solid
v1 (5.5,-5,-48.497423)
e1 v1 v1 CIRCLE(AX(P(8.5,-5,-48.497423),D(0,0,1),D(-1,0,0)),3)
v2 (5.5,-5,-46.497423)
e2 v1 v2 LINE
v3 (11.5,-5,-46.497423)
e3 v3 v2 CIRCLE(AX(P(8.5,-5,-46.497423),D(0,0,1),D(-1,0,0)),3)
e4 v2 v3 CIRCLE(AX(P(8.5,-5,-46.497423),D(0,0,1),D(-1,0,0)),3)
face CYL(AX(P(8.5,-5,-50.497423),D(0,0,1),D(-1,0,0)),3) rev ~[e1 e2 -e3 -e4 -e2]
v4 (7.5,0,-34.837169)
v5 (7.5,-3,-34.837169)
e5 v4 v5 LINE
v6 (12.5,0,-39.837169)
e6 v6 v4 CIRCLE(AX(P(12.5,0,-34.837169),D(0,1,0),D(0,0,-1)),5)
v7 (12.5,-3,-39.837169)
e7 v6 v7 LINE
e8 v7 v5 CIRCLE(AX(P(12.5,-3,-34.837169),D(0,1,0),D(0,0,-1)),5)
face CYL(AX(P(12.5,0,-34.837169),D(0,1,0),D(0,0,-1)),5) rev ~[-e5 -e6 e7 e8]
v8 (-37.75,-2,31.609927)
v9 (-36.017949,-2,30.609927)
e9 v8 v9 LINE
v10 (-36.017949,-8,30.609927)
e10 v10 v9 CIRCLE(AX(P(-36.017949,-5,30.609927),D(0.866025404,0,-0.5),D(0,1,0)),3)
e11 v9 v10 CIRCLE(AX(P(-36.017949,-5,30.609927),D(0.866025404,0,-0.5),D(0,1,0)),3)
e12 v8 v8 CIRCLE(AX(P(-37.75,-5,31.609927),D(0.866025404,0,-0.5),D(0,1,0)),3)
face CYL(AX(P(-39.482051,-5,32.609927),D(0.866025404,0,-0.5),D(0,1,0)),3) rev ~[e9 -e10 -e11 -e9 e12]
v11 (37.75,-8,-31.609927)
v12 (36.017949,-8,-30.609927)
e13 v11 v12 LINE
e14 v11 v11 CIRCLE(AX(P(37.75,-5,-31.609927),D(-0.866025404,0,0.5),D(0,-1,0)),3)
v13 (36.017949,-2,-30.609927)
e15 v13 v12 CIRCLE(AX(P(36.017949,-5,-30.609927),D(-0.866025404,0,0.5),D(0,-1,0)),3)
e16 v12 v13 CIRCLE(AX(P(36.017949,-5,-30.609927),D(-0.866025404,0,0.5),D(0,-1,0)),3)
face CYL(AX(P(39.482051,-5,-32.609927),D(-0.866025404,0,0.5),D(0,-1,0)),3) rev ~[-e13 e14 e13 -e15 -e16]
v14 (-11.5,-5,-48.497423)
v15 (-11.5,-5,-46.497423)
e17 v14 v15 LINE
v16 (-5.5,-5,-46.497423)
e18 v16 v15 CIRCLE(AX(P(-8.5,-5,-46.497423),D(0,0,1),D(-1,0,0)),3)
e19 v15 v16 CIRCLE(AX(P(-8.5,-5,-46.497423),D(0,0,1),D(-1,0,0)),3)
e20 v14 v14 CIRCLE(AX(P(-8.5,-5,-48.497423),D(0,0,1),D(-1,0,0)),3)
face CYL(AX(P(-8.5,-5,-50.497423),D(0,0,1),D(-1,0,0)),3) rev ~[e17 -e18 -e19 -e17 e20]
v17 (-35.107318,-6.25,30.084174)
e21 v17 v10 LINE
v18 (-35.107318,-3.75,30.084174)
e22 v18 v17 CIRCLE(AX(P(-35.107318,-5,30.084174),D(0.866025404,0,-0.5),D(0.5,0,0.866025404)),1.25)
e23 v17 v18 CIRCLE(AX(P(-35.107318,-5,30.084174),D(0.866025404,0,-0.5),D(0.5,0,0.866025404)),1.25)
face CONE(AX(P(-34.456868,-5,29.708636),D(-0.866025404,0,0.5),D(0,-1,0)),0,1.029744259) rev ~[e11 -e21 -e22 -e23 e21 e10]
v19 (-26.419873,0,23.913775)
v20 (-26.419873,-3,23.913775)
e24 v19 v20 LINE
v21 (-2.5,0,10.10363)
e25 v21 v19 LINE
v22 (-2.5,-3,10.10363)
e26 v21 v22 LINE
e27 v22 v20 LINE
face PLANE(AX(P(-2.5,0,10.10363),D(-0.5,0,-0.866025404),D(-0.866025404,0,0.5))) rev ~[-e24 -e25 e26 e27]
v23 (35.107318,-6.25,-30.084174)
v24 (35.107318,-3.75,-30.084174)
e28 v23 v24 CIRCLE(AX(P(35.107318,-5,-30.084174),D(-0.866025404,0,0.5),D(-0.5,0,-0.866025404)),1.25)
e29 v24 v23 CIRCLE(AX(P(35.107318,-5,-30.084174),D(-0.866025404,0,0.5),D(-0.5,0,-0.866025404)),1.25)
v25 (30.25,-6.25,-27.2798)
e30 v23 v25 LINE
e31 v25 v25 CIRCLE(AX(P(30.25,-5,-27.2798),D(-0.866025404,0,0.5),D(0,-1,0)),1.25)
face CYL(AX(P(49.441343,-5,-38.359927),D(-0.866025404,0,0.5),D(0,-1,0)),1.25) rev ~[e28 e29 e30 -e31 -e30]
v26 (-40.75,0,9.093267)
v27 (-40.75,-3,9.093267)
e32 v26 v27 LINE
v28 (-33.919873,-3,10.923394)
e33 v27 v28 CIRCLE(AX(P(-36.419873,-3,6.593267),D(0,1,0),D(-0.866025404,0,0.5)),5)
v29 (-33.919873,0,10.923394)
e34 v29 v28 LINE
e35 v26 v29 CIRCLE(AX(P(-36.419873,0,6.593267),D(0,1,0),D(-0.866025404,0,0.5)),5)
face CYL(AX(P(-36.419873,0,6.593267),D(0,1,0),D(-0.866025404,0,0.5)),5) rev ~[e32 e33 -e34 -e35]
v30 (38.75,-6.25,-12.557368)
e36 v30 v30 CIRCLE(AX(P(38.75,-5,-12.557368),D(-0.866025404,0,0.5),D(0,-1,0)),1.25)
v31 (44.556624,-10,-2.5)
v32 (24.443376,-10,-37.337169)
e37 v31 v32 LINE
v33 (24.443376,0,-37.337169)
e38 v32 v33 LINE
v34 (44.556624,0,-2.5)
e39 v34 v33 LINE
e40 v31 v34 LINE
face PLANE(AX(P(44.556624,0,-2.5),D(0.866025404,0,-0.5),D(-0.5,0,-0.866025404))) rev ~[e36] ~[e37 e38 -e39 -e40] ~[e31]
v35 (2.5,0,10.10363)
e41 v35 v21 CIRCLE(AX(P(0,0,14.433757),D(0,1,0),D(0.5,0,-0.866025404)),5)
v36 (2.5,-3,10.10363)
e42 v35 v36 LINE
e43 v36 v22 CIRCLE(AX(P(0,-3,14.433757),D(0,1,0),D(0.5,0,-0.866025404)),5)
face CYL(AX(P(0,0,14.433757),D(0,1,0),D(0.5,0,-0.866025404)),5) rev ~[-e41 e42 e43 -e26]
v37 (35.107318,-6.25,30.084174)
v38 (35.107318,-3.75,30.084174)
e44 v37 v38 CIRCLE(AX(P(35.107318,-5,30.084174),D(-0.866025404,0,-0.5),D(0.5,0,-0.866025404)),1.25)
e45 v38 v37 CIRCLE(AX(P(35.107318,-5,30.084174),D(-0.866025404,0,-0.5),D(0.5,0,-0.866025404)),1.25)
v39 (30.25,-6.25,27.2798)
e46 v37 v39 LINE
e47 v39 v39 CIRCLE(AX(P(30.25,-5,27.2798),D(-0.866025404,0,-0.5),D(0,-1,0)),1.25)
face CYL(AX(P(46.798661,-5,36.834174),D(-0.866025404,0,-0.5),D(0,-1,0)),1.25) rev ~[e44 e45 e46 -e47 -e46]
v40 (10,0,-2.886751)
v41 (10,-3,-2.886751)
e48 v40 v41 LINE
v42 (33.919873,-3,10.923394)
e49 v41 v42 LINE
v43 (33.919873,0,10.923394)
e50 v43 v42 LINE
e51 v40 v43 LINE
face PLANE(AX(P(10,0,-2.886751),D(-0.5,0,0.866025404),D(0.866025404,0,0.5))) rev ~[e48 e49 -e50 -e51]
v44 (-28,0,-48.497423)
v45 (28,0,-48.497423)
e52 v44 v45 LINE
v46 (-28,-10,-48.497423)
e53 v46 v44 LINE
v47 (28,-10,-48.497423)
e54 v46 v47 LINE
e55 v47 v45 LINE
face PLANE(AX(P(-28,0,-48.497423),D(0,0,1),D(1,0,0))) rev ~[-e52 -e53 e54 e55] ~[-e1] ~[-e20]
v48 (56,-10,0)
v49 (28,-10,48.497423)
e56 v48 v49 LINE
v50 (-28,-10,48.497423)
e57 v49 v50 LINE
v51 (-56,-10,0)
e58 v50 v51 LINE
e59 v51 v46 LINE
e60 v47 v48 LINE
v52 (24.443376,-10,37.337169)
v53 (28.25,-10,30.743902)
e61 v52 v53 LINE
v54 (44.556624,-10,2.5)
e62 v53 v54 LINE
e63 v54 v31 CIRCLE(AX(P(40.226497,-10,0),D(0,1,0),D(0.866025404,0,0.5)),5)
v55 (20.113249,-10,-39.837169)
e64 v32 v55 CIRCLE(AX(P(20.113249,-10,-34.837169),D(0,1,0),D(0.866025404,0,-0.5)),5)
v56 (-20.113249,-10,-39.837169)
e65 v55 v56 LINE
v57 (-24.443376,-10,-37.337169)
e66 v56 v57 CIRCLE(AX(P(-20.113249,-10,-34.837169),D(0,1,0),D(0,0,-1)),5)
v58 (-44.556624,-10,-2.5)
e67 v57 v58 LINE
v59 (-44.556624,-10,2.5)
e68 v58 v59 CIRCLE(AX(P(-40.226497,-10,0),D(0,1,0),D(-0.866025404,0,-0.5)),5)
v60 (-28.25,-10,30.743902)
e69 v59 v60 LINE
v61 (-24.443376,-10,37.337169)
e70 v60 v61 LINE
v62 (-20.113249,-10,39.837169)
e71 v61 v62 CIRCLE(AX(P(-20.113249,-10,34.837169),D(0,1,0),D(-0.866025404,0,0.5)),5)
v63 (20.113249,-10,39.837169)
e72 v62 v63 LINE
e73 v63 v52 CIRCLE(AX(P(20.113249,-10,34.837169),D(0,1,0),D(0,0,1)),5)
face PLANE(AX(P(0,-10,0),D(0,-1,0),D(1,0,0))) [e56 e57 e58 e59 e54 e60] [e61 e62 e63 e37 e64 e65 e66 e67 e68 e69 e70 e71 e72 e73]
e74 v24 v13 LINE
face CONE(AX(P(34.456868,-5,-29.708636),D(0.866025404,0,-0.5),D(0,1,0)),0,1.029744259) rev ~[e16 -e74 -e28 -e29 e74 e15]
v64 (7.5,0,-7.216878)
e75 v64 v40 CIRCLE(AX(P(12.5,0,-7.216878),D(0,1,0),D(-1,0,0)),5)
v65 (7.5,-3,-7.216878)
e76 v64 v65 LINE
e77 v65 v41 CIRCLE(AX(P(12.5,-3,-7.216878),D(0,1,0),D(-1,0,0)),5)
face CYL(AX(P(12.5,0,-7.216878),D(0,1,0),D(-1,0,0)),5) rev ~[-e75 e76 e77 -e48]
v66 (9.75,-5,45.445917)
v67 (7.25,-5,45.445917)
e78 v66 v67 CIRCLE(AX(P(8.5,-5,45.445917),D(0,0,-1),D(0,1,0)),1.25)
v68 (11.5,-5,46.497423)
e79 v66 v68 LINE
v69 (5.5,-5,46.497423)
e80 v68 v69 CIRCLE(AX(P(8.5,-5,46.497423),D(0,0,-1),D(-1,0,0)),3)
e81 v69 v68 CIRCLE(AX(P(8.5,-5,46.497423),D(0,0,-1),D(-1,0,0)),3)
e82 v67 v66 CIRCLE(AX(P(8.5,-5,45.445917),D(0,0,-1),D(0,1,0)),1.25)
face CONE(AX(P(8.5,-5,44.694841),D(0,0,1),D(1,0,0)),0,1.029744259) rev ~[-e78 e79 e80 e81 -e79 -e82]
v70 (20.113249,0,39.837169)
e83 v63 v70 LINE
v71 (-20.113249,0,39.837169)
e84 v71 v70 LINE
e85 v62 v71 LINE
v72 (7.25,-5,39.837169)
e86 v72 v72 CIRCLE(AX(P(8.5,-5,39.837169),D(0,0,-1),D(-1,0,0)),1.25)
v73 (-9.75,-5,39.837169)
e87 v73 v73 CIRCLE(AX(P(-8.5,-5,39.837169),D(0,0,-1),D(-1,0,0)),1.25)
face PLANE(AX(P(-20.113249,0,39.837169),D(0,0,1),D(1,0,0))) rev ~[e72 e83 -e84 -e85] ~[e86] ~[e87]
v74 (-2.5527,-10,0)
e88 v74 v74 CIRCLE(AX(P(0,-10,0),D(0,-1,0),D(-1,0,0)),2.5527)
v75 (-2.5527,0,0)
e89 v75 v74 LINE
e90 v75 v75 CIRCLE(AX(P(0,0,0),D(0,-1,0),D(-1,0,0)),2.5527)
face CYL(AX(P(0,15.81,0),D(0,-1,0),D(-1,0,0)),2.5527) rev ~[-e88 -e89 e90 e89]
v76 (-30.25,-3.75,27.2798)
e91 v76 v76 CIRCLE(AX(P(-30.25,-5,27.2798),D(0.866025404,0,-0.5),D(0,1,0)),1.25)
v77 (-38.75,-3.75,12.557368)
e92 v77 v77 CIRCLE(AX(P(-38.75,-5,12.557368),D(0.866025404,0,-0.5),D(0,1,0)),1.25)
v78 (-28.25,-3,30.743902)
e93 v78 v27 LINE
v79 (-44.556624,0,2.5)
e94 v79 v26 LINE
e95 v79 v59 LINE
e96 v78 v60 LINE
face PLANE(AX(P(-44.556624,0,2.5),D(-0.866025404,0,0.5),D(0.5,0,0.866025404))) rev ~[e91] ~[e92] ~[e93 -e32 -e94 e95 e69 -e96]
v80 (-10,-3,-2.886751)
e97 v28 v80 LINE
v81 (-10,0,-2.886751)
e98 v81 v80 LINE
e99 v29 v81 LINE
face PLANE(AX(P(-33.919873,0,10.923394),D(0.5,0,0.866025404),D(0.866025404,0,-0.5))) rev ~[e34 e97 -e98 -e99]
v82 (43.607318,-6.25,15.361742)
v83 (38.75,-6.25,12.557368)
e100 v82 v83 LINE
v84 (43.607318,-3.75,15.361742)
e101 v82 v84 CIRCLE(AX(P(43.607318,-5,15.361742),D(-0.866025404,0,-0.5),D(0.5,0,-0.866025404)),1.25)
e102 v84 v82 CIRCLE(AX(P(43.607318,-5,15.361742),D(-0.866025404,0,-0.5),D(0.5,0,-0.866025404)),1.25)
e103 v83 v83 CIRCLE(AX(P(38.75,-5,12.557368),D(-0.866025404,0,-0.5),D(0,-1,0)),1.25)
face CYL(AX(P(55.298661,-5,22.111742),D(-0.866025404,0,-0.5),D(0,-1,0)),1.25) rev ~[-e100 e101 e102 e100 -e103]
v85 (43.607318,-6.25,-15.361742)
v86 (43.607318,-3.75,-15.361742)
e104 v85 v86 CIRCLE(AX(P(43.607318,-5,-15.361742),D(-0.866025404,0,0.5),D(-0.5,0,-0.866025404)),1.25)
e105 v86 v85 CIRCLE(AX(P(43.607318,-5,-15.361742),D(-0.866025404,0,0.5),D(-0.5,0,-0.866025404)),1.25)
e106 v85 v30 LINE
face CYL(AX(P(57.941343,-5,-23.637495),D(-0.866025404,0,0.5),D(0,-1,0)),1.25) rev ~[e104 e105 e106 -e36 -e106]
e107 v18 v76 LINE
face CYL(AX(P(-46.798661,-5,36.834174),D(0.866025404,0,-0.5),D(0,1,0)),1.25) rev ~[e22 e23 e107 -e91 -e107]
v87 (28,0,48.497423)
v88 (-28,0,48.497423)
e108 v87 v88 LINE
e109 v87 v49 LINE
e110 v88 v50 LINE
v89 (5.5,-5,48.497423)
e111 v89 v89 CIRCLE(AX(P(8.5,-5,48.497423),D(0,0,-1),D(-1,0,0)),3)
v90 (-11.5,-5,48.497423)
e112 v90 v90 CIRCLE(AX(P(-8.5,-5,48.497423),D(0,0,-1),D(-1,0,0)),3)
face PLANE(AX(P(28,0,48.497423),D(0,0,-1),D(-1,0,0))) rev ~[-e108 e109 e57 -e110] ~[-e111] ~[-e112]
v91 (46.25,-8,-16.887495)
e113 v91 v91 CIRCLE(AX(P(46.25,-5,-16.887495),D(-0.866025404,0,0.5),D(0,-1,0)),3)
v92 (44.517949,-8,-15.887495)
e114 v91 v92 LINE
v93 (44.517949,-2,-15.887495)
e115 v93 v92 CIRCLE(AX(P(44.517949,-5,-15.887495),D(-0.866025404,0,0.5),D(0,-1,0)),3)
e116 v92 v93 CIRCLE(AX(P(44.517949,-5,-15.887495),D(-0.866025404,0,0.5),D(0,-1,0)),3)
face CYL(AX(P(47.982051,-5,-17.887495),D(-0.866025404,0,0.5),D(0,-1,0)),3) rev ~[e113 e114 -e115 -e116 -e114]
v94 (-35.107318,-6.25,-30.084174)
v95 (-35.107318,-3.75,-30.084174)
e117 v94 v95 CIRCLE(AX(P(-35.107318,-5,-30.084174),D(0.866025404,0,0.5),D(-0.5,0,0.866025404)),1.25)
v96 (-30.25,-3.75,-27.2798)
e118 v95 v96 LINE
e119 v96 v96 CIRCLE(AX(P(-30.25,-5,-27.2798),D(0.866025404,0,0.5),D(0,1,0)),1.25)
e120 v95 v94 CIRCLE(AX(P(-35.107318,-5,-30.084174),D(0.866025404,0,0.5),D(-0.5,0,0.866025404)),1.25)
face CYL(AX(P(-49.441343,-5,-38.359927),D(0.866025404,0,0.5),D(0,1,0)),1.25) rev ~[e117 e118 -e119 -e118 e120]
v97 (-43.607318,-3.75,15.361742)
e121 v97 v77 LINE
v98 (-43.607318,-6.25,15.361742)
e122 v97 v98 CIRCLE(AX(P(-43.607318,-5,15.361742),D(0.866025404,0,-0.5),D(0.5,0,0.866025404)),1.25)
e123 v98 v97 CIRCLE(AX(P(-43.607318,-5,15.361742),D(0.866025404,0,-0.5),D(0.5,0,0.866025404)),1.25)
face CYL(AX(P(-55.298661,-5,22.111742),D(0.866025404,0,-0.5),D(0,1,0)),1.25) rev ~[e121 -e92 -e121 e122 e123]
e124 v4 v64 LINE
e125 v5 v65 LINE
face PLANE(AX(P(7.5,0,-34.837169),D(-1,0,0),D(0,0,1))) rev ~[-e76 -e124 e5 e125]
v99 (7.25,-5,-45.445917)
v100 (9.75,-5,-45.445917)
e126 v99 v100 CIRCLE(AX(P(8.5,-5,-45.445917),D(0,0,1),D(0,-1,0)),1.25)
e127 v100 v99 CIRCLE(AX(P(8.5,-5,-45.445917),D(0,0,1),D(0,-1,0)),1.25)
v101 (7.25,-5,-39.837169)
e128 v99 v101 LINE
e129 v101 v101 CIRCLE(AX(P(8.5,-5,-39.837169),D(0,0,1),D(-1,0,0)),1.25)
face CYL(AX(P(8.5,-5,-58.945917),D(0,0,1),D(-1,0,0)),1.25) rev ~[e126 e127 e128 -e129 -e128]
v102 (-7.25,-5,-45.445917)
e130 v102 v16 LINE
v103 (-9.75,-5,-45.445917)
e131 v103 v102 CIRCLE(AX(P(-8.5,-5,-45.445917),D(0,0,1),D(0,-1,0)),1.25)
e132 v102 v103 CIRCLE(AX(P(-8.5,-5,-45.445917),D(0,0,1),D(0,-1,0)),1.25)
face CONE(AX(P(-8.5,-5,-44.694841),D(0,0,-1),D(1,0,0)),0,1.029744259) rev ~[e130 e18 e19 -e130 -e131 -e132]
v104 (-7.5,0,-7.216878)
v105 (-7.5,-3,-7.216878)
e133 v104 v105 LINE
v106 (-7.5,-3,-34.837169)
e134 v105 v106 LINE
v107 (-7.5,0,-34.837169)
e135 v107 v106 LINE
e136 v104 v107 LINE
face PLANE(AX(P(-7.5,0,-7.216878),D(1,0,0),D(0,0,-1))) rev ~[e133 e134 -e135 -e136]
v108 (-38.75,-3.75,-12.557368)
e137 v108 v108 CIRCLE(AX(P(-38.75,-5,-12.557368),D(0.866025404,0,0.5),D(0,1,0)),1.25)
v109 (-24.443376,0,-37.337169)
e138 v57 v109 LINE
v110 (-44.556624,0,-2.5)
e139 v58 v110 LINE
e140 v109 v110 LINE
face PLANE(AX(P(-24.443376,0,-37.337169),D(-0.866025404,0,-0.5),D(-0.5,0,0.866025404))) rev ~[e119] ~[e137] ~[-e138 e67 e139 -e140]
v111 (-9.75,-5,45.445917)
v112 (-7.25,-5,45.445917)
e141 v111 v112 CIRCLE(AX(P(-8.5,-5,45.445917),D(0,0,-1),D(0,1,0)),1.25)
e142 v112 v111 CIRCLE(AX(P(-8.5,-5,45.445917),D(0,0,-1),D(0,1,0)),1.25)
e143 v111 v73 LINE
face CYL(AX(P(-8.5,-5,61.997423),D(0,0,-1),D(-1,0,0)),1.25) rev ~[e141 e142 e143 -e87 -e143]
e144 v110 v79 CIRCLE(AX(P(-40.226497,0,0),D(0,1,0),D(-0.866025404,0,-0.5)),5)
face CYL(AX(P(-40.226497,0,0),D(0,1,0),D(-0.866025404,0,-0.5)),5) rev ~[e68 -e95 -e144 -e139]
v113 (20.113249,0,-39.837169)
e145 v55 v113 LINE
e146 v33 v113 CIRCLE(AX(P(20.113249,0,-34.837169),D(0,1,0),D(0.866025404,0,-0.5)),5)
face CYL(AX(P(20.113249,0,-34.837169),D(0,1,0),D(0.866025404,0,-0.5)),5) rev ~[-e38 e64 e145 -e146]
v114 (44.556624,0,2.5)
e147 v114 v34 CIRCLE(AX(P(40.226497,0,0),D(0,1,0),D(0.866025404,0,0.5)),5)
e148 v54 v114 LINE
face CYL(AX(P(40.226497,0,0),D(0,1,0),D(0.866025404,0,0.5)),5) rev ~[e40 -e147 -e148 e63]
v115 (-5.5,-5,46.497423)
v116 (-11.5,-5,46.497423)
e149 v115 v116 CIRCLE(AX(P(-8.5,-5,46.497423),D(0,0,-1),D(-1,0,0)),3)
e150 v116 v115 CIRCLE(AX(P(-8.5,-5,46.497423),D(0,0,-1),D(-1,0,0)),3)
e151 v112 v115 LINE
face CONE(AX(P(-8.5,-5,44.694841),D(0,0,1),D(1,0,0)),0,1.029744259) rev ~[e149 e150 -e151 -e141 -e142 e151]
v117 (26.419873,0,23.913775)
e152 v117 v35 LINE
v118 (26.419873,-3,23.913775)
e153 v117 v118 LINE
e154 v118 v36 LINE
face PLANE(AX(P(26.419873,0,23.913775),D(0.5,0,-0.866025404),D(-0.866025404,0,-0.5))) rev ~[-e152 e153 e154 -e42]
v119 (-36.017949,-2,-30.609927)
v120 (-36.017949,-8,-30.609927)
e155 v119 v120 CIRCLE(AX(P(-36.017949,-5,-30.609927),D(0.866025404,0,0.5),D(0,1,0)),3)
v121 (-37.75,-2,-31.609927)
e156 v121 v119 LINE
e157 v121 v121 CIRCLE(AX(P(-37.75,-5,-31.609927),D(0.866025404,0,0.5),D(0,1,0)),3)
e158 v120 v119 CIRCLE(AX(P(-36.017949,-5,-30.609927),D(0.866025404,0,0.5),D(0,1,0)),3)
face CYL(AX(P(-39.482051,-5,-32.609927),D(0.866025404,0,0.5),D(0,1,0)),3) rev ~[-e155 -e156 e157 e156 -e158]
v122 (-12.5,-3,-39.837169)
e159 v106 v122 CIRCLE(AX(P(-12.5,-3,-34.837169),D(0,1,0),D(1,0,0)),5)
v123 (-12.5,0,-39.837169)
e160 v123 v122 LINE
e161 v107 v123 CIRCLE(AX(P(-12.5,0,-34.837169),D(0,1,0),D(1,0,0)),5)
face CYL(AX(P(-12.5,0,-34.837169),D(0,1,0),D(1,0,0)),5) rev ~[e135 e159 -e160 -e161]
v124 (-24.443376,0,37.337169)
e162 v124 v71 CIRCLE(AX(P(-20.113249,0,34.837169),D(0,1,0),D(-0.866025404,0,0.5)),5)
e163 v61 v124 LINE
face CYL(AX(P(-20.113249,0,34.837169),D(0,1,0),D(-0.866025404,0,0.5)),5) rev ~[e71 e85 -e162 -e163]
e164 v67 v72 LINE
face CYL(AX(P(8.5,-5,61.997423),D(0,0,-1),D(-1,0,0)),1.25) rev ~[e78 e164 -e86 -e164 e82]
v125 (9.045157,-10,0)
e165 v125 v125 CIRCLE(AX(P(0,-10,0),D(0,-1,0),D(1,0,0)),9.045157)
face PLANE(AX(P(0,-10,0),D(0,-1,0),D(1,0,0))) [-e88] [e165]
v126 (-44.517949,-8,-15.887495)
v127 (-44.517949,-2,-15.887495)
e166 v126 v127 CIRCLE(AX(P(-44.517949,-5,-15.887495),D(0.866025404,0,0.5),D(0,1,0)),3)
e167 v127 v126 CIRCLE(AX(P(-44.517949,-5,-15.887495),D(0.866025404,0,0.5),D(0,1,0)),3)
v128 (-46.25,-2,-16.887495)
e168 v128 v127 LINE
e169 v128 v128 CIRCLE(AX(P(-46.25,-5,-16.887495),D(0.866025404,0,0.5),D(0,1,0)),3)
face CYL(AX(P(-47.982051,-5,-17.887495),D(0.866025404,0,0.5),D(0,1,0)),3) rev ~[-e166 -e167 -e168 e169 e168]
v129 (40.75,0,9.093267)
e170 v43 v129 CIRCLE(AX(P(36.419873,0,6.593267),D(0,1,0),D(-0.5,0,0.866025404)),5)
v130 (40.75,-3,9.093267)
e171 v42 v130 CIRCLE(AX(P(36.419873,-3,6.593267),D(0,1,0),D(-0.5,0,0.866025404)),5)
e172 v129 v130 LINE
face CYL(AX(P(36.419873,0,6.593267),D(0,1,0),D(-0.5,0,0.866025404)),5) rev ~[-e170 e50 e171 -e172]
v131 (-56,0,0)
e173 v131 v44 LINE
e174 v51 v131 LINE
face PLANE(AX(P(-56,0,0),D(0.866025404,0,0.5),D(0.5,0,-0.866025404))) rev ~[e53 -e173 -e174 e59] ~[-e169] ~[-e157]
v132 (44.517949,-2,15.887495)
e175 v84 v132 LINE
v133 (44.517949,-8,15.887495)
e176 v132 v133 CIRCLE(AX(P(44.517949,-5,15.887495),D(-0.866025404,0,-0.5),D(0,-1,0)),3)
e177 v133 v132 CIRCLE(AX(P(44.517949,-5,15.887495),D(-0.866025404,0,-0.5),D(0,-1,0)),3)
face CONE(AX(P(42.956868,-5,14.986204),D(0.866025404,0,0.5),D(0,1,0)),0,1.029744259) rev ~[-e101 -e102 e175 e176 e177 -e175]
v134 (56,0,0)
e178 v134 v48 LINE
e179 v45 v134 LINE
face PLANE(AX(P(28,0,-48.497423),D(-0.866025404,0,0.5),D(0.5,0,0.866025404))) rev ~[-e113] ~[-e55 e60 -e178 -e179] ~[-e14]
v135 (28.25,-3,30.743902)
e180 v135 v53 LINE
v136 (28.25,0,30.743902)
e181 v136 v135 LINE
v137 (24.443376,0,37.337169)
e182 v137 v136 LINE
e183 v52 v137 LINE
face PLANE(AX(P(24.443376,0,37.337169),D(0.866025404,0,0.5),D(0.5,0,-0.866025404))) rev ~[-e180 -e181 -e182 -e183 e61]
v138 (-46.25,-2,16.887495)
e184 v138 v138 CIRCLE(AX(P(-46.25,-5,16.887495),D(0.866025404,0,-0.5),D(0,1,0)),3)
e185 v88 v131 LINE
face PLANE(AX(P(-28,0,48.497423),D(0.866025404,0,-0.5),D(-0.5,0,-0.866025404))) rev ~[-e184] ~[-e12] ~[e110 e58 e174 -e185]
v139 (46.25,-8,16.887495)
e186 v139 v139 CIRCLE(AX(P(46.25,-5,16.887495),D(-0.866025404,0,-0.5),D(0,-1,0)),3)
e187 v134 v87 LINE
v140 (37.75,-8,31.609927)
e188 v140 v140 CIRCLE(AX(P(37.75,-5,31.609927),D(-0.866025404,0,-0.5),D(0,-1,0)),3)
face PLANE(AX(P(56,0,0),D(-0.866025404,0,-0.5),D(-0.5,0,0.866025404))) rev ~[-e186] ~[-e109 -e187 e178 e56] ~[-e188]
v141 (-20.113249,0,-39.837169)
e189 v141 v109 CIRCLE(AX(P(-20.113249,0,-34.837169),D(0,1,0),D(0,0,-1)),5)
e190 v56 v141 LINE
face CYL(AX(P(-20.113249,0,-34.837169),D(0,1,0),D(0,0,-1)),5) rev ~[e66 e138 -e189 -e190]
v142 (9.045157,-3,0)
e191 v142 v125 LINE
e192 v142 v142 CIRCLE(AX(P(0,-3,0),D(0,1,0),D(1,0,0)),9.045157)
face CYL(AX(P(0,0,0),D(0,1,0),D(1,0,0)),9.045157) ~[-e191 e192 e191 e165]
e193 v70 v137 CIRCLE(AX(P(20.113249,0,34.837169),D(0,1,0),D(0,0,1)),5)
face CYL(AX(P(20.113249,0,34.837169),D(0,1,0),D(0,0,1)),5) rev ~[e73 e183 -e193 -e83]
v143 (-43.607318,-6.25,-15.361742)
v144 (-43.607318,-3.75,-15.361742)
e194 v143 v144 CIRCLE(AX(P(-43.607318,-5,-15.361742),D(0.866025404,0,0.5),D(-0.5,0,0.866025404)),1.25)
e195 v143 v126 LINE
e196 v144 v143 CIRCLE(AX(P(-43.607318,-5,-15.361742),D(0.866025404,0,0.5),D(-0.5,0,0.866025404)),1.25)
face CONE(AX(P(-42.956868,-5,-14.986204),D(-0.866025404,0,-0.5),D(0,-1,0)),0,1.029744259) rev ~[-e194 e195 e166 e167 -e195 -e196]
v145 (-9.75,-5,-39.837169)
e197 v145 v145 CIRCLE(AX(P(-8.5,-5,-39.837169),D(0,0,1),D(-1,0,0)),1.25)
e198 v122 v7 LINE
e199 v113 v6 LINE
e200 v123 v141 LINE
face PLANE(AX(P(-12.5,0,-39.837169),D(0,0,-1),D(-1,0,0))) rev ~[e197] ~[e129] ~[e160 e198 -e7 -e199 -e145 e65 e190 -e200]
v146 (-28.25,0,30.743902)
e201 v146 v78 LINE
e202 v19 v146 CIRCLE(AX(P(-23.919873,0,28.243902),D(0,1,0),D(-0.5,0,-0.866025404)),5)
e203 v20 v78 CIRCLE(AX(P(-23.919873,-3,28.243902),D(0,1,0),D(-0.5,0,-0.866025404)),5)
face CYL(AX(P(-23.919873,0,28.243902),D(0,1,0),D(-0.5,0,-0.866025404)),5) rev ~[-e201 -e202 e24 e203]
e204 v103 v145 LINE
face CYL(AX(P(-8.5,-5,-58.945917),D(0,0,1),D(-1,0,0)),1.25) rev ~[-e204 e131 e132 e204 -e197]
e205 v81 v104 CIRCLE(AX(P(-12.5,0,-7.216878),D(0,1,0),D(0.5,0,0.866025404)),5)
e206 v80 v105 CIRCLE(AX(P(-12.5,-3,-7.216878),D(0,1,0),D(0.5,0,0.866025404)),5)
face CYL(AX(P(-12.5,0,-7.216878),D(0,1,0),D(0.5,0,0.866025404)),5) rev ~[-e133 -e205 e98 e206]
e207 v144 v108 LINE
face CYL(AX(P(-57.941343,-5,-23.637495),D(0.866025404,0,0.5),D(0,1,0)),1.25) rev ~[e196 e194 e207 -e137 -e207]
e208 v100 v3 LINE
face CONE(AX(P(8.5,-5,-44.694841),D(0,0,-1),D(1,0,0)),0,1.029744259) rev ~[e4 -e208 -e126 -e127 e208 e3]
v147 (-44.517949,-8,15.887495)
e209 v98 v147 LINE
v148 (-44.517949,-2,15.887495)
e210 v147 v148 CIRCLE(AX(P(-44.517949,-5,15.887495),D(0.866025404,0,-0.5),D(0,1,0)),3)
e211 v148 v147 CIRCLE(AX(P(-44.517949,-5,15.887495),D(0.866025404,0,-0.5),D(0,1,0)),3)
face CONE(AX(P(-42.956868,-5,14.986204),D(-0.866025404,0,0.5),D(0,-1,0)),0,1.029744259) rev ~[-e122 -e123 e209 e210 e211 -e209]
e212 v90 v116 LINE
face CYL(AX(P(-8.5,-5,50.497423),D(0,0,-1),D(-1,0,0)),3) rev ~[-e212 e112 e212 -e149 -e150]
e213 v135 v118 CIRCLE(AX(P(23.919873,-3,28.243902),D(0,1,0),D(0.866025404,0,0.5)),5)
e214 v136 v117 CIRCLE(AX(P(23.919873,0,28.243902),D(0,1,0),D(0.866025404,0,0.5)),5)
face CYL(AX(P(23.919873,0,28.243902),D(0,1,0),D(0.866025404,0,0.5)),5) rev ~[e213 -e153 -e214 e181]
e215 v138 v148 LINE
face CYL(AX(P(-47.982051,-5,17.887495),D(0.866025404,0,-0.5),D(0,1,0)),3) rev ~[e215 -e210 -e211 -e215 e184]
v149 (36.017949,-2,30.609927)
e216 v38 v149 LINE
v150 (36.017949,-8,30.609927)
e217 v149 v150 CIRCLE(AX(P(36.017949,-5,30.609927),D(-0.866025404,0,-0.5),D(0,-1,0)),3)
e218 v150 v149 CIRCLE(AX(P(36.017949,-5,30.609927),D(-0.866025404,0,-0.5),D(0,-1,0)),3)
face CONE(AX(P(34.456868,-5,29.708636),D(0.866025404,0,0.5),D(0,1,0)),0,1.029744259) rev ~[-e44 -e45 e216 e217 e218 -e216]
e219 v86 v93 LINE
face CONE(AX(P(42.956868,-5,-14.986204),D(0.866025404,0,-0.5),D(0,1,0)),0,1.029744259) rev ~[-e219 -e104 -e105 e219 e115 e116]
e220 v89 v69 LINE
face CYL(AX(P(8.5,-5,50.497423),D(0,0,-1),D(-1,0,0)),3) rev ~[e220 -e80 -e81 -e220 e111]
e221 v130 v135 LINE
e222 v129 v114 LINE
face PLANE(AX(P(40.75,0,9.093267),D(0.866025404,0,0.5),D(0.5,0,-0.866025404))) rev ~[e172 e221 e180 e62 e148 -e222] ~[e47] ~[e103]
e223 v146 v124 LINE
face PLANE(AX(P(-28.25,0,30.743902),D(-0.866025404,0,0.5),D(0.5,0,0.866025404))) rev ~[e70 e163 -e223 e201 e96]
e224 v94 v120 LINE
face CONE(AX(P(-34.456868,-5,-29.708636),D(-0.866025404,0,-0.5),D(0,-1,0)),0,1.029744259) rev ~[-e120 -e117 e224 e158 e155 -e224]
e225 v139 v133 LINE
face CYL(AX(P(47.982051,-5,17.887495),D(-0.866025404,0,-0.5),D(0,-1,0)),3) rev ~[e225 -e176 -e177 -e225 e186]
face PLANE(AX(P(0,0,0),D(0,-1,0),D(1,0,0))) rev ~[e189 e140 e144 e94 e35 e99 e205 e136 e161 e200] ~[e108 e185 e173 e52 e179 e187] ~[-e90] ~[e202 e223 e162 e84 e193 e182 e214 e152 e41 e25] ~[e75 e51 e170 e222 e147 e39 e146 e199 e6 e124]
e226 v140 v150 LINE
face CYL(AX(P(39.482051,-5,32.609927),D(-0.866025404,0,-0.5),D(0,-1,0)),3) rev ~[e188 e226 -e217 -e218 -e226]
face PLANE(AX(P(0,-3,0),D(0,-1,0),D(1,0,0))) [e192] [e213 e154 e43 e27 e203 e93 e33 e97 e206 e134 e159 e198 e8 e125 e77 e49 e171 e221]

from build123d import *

# Parameters (mm, degrees)
F0_R      = 9.0451569713
F1_DEPTH  = 3
F2_DEPTH  = 10
F8_D      = 6
F8_DEPTH  = 2
F8_TIP    = 1.8025818571
F9_D      = 2.5
F9_DEPTH  = 13.5
F9_START  = 3.0515061
F9_TIP    = 0.7510757738
F10_D     = 2.5
F10_DEPTH = 13.5
F10_TIP   = 0.7510757738
F11_D     = 6
F11_DEPTH = 2
F11_TIP   = 1.8025818571
F12_D     = 6
F12_DEPTH = 2
F12_TIP   = 1.8025818571
F13_D     = 2.5
F13_DEPTH = 13.5
F13_START = 3.0515061
F13_TIP   = 0.7510757738
F15_D     = 2.5
F15_DEPTH = 13.5
F15_TIP   = 0.7510757738
F16_D     = 6
F16_DEPTH = 2
F16_TIP   = 1.8025818571
F17_D     = 6
F17_DEPTH = 2
F17_TIP   = 1.8025818571
F18_D     = 2.5
F18_DEPTH = 13.5
F18_START = 3.0515061
F18_TIP   = 0.7510757738
F19_D     = 2.5
F19_DEPTH = 13.5
F19_TIP   = 0.7510757738
F20_D     = 6
F20_DEPTH = 2
F20_TIP   = 1.8025818571
F21_D     = 5.1054
F21_DEPTH = 15.81
F21_TIP   = 1.5338169022


with BuildPart() as f1:
    # F0 (on Front) → F1 (new body)
    with BuildSketch(Plane.XZ):
        Polygon((28, -48.4974226119), (56, 0), (28, 48.4974226119), (-28, 48.4974226119), (-56, 0), (-28, -48.4974226119), align=None)
        with BuildLine():
            ThreePointArc((44.556624327, 2.5), (45.2264973081, 0), (44.556624327, -2.5))
            Line((44.556624327, -2.5), (24.443375673, -37.3371685741))
            ThreePointArc((24.443375673, -37.3371685741), (22.6132486541, -39.167295593), (20.1132486541, -39.8371685741))
            Line((20.1132486541, -39.8371685741), (12.5, -39.8371685741))
            Line((12.5, -39.8371685741), (-12.5, -39.8371685741))
            Line((-12.5, -39.8371685741), (-20.1132486541, -39.8371685741))
            ThreePointArc((-20.1132486541, -39.8371685741), (-22.6132486541, -39.167295593), (-24.443375673, -37.3371685741))
            Line((-24.443375673, -37.3371685741), (-44.556624327, -2.5))
            ThreePointArc((-44.556624327, -2.5), (-45.2264973081, 0), (-44.556624327, 2.5))
            Line((-44.556624327, 2.5), (-40.75, 9.0932667397))
            Line((-40.75, 9.0932667397), (-28.25, 30.7439018343))
            Line((-28.25, 30.7439018343), (-24.443375673, 37.3371685741))
            ThreePointArc((-24.443375673, 37.3371685741), (-22.6132486541, 39.167295593), (-20.1132486541, 39.8371685741))
            Line((-20.1132486541, 39.8371685741), (20.1132486541, 39.8371685741))
            ThreePointArc((20.1132486541, 39.8371685741), (22.6132486541, 39.167295593), (24.443375673, 37.3371685741))
            Line((24.443375673, 37.3371685741), (28.25, 30.7439018343))
            Line((28.25, 30.7439018343), (40.75, 9.0932667397))
            Line((40.75, 9.0932667397), (44.556624327, 2.5))
        make_face(mode=Mode.SUBTRACT)
        with BuildLine():
            ThreePointArc((33.9198729811, 10.9233937587), (37.7139682066, 11.4228958712), (40.75, 9.0932667397))
            Line((40.75, 9.0932667397), (28.25, 30.7439018343))
            ThreePointArc((28.25, 30.7439018343), (28.7495021125, 26.9498066088), (26.4198729811, 23.9137748154))
            Line((26.4198729811, 23.9137748154), (2.5, 10.1036297108))
            ThreePointArc((2.5, 10.1036297108), (0, 9.4337567297), (-2.5, 10.1036297108))
            Line((-2.5, 10.1036297108), (-26.4198729811, 23.9137748154))
            ThreePointArc((-26.4198729811, 23.9137748154), (-28.7495021125, 26.9498066088), (-28.25, 30.7439018343))
            Line((-28.25, 30.7439018343), (-40.75, 9.0932667397))
            ThreePointArc((-40.75, 9.0932667397), (-37.7139682066, 11.4228958712), (-33.9198729811, 10.9233937587))
            Line((-33.9198729811, 10.9233937587), (-10, -2.8867513459))
            ThreePointArc((-10, -2.8867513459), (-8.1698729811, -4.7168783649), (-7.5, -7.2168783649))
            Line((-7.5, -7.2168783649), (-7.5, -34.8371685741))
            ThreePointArc((-7.5, -34.8371685741), (-8.9644660941, -38.37270248), (-12.5, -39.8371685741))
            Line((-12.5, -39.8371685741), (12.5, -39.8371685741))
            ThreePointArc((12.5, -39.8371685741), (8.9644660941, -38.37270248), (7.5, -34.8371685741))
            Line((7.5, -34.8371685741), (7.5, -7.2168783649))
            ThreePointArc((7.5, -7.2168783649), (8.1698729811, -4.7168783649), (10, -2.8867513459))
            Line((10, -2.8867513459), (33.9198729811, 10.9233937587))
        make_face()
        Circle(F0_R, mode=Mode.SUBTRACT)
        Circle(F0_R)
    extrude(amount=F1_DEPTH)

    # F0 (on Front) → F2 (join)
    with BuildSketch(Plane.XZ):
        Polygon((28, -48.4974226119), (56, 0), (28, 48.4974226119), (-28, 48.4974226119), (-56, 0), (-28, -48.4974226119), align=None)
        with BuildLine():
            ThreePointArc((44.556624327, 2.5), (45.2264973081, 0), (44.556624327, -2.5))
            Line((44.556624327, -2.5), (24.443375673, -37.3371685741))
            ThreePointArc((24.443375673, -37.3371685741), (22.6132486541, -39.167295593), (20.1132486541, -39.8371685741))
            Line((20.1132486541, -39.8371685741), (12.5, -39.8371685741))
            Line((12.5, -39.8371685741), (-12.5, -39.8371685741))
            Line((-12.5, -39.8371685741), (-20.1132486541, -39.8371685741))
            ThreePointArc((-20.1132486541, -39.8371685741), (-22.6132486541, -39.167295593), (-24.443375673, -37.3371685741))
            Line((-24.443375673, -37.3371685741), (-44.556624327, -2.5))
            ThreePointArc((-44.556624327, -2.5), (-45.2264973081, 0), (-44.556624327, 2.5))
            Line((-44.556624327, 2.5), (-40.75, 9.0932667397))
            Line((-40.75, 9.0932667397), (-28.25, 30.7439018343))
            Line((-28.25, 30.7439018343), (-24.443375673, 37.3371685741))
            ThreePointArc((-24.443375673, 37.3371685741), (-22.6132486541, 39.167295593), (-20.1132486541, 39.8371685741))
            Line((-20.1132486541, 39.8371685741), (20.1132486541, 39.8371685741))
            ThreePointArc((20.1132486541, 39.8371685741), (22.6132486541, 39.167295593), (24.443375673, 37.3371685741))
            Line((24.443375673, 37.3371685741), (28.25, 30.7439018343))
            Line((28.25, 30.7439018343), (40.75, 9.0932667397))
            Line((40.75, 9.0932667397), (44.556624327, 2.5))
        make_face(mode=Mode.SUBTRACT)
        Circle(F0_R)
    extrude(amount=F2_DEPTH)

    # F8
    with Locations(Plane(origin=(0, 0, -48.4974226119), x_dir=(1, 0, 0), z_dir=(0, 0, -1))):
        with Locations((-8.5, 5), (8.5, 5)):
            Hole(F8_D / 2, depth=F8_DEPTH)
            with Locations((0, 0, -(F8_DEPTH + F8_TIP / 2))):  # 118° drill point
                Cone(0, F8_D / 2, F8_TIP, mode=Mode.SUBTRACT)

    # F9
    # its depths count from where the whole tool has entered the part; down to there all is cleared
    with Locations(Plane(origin=(0, 0, -48.4974226119), x_dir=(1, 0, 0), z_dir=(0, 0, -1)).offset(-F9_START)):
        with Locations((-8.5, 5), (8.5, 5)):
            Hole(F9_D / 2, depth=F9_DEPTH)
            with Locations((0, 0, -(F9_DEPTH + F9_TIP / 2))):  # 118° drill point
                Cone(0, F9_D / 2, F9_TIP, mode=Mode.SUBTRACT)

    # F10
    with Locations(Plane(origin=(42, 0, -24.248711306), x_dir=(0, 1, 0), z_dir=(0.8660254038, 0, -0.5))):
        with Locations((-5, -8.5), (-5, 8.5)):
            Hole(F10_D / 2, depth=F10_DEPTH)
            with Locations((0, 0, -(F10_DEPTH + F10_TIP / 2))):  # 118° drill point
                Cone(0, F10_D / 2, F10_TIP, mode=Mode.SUBTRACT)

    # F11
    with Locations(Plane(origin=(42, 0, -24.248711306), x_dir=(0, 1, 0), z_dir=(0.8660254038, 0, -0.5))):
        with Locations((-5, -8.5), (-5, 8.5)):
            Hole(F11_D / 2, depth=F11_DEPTH)
            with Locations((0, 0, -(F11_DEPTH + F11_TIP / 2))):  # 118° drill point
                Cone(0, F11_D / 2, F11_TIP, mode=Mode.SUBTRACT)

    # F12
    with Locations(Plane(origin=(42, 0, 24.248711306), x_dir=(0, 1, 0), z_dir=(0.8660254038, 0, 0.5))):
        with Locations((-5, -8.5), (-5, 8.5)):
            Hole(F12_D / 2, depth=F12_DEPTH)
            with Locations((0, 0, -(F12_DEPTH + F12_TIP / 2))):  # 118° drill point
                Cone(0, F12_D / 2, F12_TIP, mode=Mode.SUBTRACT)

    # F13
    # its depths count from where the whole tool has entered the part; down to there all is cleared
    with Locations(Plane(origin=(42, 0, 24.248711306), x_dir=(0, 1, 0), z_dir=(0.8660254038, 0, 0.5)).offset(-F13_START)):
        with Locations((-5, -8.5), (-5, 8.5)):
            Hole(F13_D / 2, depth=F13_DEPTH)
            with Locations((0, 0, -(F13_DEPTH + F13_TIP / 2))):  # 118° drill point
                Cone(0, F13_D / 2, F13_TIP, mode=Mode.SUBTRACT)

    # F15
    with Locations(Plane.XY.offset(48.4974226119)):
        with Locations((8.5, -5), (-8.5, -5)):
            Hole(F15_D / 2, depth=F15_DEPTH)
            with Locations((0, 0, -(F15_DEPTH + F15_TIP / 2))):  # 118° drill point
                Cone(0, F15_D / 2, F15_TIP, mode=Mode.SUBTRACT)

    # F16
    with Locations(Plane.XY.offset(48.4974226119)):
        with Locations((8.5, -5), (-8.5, -5)):
            Hole(F16_D / 2, depth=F16_DEPTH)
            with Locations((0, 0, -(F16_DEPTH + F16_TIP / 2))):  # 118° drill point
                Cone(0, F16_D / 2, F16_TIP, mode=Mode.SUBTRACT)

    # F17
    with Locations(Plane(origin=(-42, 0, 24.248711306), x_dir=(0, -1, 0), z_dir=(-0.8660254038, 0, 0.5))):
        with Locations((5, 8.5), (5, -8.5)):
            Hole(F17_D / 2, depth=F17_DEPTH)
            with Locations((0, 0, -(F17_DEPTH + F17_TIP / 2))):  # 118° drill point
                Cone(0, F17_D / 2, F17_TIP, mode=Mode.SUBTRACT)

    # F18
    # its depths count from where the whole tool has entered the part; down to there all is cleared
    with Locations(Plane(origin=(-42, 0, 24.248711306), x_dir=(0, -1, 0), z_dir=(-0.8660254038, 0, 0.5)).offset(-F18_START)):
        with Locations((5, 8.5), (5, -8.5)):
            Hole(F18_D / 2, depth=F18_DEPTH)
            with Locations((0, 0, -(F18_DEPTH + F18_TIP / 2))):  # 118° drill point
                Cone(0, F18_D / 2, F18_TIP, mode=Mode.SUBTRACT)

    # F19
    with Locations(Plane(origin=(-42, 0, -24.248711306), x_dir=(0, -1, 0), z_dir=(-0.8660254038, 0, -0.5))):
        with Locations((5, 8.5), (5, -8.5)):
            Hole(F19_D / 2, depth=F19_DEPTH)
            with Locations((0, 0, -(F19_DEPTH + F19_TIP / 2))):  # 118° drill point
                Cone(0, F19_D / 2, F19_TIP, mode=Mode.SUBTRACT)

    # F20
    with Locations(Plane(origin=(-42, 0, -24.248711306), x_dir=(0, -1, 0), z_dir=(-0.8660254038, 0, -0.5))):
        with Locations((5, 8.5), (5, -8.5)):
            Hole(F20_D / 2, depth=F20_DEPTH)
            with Locations((0, 0, -(F20_DEPTH + F20_TIP / 2))):  # 118° drill point
                Cone(0, F20_D / 2, F20_TIP, mode=Mode.SUBTRACT)

    # F21
    with Locations(Plane(origin=(0, 0, 0), x_dir=(1, 0, 0), z_dir=(0, 1, 0))):
        with Locations((0, 0)):
            Hole(F21_D / 2, depth=F21_DEPTH)
            with Locations((0, 0, -(F21_DEPTH + F21_TIP / 2))):  # 118° drill point
                Cone(0, F21_D / 2, F21_TIP, mode=Mode.SUBTRACT)


solid = f1.part
